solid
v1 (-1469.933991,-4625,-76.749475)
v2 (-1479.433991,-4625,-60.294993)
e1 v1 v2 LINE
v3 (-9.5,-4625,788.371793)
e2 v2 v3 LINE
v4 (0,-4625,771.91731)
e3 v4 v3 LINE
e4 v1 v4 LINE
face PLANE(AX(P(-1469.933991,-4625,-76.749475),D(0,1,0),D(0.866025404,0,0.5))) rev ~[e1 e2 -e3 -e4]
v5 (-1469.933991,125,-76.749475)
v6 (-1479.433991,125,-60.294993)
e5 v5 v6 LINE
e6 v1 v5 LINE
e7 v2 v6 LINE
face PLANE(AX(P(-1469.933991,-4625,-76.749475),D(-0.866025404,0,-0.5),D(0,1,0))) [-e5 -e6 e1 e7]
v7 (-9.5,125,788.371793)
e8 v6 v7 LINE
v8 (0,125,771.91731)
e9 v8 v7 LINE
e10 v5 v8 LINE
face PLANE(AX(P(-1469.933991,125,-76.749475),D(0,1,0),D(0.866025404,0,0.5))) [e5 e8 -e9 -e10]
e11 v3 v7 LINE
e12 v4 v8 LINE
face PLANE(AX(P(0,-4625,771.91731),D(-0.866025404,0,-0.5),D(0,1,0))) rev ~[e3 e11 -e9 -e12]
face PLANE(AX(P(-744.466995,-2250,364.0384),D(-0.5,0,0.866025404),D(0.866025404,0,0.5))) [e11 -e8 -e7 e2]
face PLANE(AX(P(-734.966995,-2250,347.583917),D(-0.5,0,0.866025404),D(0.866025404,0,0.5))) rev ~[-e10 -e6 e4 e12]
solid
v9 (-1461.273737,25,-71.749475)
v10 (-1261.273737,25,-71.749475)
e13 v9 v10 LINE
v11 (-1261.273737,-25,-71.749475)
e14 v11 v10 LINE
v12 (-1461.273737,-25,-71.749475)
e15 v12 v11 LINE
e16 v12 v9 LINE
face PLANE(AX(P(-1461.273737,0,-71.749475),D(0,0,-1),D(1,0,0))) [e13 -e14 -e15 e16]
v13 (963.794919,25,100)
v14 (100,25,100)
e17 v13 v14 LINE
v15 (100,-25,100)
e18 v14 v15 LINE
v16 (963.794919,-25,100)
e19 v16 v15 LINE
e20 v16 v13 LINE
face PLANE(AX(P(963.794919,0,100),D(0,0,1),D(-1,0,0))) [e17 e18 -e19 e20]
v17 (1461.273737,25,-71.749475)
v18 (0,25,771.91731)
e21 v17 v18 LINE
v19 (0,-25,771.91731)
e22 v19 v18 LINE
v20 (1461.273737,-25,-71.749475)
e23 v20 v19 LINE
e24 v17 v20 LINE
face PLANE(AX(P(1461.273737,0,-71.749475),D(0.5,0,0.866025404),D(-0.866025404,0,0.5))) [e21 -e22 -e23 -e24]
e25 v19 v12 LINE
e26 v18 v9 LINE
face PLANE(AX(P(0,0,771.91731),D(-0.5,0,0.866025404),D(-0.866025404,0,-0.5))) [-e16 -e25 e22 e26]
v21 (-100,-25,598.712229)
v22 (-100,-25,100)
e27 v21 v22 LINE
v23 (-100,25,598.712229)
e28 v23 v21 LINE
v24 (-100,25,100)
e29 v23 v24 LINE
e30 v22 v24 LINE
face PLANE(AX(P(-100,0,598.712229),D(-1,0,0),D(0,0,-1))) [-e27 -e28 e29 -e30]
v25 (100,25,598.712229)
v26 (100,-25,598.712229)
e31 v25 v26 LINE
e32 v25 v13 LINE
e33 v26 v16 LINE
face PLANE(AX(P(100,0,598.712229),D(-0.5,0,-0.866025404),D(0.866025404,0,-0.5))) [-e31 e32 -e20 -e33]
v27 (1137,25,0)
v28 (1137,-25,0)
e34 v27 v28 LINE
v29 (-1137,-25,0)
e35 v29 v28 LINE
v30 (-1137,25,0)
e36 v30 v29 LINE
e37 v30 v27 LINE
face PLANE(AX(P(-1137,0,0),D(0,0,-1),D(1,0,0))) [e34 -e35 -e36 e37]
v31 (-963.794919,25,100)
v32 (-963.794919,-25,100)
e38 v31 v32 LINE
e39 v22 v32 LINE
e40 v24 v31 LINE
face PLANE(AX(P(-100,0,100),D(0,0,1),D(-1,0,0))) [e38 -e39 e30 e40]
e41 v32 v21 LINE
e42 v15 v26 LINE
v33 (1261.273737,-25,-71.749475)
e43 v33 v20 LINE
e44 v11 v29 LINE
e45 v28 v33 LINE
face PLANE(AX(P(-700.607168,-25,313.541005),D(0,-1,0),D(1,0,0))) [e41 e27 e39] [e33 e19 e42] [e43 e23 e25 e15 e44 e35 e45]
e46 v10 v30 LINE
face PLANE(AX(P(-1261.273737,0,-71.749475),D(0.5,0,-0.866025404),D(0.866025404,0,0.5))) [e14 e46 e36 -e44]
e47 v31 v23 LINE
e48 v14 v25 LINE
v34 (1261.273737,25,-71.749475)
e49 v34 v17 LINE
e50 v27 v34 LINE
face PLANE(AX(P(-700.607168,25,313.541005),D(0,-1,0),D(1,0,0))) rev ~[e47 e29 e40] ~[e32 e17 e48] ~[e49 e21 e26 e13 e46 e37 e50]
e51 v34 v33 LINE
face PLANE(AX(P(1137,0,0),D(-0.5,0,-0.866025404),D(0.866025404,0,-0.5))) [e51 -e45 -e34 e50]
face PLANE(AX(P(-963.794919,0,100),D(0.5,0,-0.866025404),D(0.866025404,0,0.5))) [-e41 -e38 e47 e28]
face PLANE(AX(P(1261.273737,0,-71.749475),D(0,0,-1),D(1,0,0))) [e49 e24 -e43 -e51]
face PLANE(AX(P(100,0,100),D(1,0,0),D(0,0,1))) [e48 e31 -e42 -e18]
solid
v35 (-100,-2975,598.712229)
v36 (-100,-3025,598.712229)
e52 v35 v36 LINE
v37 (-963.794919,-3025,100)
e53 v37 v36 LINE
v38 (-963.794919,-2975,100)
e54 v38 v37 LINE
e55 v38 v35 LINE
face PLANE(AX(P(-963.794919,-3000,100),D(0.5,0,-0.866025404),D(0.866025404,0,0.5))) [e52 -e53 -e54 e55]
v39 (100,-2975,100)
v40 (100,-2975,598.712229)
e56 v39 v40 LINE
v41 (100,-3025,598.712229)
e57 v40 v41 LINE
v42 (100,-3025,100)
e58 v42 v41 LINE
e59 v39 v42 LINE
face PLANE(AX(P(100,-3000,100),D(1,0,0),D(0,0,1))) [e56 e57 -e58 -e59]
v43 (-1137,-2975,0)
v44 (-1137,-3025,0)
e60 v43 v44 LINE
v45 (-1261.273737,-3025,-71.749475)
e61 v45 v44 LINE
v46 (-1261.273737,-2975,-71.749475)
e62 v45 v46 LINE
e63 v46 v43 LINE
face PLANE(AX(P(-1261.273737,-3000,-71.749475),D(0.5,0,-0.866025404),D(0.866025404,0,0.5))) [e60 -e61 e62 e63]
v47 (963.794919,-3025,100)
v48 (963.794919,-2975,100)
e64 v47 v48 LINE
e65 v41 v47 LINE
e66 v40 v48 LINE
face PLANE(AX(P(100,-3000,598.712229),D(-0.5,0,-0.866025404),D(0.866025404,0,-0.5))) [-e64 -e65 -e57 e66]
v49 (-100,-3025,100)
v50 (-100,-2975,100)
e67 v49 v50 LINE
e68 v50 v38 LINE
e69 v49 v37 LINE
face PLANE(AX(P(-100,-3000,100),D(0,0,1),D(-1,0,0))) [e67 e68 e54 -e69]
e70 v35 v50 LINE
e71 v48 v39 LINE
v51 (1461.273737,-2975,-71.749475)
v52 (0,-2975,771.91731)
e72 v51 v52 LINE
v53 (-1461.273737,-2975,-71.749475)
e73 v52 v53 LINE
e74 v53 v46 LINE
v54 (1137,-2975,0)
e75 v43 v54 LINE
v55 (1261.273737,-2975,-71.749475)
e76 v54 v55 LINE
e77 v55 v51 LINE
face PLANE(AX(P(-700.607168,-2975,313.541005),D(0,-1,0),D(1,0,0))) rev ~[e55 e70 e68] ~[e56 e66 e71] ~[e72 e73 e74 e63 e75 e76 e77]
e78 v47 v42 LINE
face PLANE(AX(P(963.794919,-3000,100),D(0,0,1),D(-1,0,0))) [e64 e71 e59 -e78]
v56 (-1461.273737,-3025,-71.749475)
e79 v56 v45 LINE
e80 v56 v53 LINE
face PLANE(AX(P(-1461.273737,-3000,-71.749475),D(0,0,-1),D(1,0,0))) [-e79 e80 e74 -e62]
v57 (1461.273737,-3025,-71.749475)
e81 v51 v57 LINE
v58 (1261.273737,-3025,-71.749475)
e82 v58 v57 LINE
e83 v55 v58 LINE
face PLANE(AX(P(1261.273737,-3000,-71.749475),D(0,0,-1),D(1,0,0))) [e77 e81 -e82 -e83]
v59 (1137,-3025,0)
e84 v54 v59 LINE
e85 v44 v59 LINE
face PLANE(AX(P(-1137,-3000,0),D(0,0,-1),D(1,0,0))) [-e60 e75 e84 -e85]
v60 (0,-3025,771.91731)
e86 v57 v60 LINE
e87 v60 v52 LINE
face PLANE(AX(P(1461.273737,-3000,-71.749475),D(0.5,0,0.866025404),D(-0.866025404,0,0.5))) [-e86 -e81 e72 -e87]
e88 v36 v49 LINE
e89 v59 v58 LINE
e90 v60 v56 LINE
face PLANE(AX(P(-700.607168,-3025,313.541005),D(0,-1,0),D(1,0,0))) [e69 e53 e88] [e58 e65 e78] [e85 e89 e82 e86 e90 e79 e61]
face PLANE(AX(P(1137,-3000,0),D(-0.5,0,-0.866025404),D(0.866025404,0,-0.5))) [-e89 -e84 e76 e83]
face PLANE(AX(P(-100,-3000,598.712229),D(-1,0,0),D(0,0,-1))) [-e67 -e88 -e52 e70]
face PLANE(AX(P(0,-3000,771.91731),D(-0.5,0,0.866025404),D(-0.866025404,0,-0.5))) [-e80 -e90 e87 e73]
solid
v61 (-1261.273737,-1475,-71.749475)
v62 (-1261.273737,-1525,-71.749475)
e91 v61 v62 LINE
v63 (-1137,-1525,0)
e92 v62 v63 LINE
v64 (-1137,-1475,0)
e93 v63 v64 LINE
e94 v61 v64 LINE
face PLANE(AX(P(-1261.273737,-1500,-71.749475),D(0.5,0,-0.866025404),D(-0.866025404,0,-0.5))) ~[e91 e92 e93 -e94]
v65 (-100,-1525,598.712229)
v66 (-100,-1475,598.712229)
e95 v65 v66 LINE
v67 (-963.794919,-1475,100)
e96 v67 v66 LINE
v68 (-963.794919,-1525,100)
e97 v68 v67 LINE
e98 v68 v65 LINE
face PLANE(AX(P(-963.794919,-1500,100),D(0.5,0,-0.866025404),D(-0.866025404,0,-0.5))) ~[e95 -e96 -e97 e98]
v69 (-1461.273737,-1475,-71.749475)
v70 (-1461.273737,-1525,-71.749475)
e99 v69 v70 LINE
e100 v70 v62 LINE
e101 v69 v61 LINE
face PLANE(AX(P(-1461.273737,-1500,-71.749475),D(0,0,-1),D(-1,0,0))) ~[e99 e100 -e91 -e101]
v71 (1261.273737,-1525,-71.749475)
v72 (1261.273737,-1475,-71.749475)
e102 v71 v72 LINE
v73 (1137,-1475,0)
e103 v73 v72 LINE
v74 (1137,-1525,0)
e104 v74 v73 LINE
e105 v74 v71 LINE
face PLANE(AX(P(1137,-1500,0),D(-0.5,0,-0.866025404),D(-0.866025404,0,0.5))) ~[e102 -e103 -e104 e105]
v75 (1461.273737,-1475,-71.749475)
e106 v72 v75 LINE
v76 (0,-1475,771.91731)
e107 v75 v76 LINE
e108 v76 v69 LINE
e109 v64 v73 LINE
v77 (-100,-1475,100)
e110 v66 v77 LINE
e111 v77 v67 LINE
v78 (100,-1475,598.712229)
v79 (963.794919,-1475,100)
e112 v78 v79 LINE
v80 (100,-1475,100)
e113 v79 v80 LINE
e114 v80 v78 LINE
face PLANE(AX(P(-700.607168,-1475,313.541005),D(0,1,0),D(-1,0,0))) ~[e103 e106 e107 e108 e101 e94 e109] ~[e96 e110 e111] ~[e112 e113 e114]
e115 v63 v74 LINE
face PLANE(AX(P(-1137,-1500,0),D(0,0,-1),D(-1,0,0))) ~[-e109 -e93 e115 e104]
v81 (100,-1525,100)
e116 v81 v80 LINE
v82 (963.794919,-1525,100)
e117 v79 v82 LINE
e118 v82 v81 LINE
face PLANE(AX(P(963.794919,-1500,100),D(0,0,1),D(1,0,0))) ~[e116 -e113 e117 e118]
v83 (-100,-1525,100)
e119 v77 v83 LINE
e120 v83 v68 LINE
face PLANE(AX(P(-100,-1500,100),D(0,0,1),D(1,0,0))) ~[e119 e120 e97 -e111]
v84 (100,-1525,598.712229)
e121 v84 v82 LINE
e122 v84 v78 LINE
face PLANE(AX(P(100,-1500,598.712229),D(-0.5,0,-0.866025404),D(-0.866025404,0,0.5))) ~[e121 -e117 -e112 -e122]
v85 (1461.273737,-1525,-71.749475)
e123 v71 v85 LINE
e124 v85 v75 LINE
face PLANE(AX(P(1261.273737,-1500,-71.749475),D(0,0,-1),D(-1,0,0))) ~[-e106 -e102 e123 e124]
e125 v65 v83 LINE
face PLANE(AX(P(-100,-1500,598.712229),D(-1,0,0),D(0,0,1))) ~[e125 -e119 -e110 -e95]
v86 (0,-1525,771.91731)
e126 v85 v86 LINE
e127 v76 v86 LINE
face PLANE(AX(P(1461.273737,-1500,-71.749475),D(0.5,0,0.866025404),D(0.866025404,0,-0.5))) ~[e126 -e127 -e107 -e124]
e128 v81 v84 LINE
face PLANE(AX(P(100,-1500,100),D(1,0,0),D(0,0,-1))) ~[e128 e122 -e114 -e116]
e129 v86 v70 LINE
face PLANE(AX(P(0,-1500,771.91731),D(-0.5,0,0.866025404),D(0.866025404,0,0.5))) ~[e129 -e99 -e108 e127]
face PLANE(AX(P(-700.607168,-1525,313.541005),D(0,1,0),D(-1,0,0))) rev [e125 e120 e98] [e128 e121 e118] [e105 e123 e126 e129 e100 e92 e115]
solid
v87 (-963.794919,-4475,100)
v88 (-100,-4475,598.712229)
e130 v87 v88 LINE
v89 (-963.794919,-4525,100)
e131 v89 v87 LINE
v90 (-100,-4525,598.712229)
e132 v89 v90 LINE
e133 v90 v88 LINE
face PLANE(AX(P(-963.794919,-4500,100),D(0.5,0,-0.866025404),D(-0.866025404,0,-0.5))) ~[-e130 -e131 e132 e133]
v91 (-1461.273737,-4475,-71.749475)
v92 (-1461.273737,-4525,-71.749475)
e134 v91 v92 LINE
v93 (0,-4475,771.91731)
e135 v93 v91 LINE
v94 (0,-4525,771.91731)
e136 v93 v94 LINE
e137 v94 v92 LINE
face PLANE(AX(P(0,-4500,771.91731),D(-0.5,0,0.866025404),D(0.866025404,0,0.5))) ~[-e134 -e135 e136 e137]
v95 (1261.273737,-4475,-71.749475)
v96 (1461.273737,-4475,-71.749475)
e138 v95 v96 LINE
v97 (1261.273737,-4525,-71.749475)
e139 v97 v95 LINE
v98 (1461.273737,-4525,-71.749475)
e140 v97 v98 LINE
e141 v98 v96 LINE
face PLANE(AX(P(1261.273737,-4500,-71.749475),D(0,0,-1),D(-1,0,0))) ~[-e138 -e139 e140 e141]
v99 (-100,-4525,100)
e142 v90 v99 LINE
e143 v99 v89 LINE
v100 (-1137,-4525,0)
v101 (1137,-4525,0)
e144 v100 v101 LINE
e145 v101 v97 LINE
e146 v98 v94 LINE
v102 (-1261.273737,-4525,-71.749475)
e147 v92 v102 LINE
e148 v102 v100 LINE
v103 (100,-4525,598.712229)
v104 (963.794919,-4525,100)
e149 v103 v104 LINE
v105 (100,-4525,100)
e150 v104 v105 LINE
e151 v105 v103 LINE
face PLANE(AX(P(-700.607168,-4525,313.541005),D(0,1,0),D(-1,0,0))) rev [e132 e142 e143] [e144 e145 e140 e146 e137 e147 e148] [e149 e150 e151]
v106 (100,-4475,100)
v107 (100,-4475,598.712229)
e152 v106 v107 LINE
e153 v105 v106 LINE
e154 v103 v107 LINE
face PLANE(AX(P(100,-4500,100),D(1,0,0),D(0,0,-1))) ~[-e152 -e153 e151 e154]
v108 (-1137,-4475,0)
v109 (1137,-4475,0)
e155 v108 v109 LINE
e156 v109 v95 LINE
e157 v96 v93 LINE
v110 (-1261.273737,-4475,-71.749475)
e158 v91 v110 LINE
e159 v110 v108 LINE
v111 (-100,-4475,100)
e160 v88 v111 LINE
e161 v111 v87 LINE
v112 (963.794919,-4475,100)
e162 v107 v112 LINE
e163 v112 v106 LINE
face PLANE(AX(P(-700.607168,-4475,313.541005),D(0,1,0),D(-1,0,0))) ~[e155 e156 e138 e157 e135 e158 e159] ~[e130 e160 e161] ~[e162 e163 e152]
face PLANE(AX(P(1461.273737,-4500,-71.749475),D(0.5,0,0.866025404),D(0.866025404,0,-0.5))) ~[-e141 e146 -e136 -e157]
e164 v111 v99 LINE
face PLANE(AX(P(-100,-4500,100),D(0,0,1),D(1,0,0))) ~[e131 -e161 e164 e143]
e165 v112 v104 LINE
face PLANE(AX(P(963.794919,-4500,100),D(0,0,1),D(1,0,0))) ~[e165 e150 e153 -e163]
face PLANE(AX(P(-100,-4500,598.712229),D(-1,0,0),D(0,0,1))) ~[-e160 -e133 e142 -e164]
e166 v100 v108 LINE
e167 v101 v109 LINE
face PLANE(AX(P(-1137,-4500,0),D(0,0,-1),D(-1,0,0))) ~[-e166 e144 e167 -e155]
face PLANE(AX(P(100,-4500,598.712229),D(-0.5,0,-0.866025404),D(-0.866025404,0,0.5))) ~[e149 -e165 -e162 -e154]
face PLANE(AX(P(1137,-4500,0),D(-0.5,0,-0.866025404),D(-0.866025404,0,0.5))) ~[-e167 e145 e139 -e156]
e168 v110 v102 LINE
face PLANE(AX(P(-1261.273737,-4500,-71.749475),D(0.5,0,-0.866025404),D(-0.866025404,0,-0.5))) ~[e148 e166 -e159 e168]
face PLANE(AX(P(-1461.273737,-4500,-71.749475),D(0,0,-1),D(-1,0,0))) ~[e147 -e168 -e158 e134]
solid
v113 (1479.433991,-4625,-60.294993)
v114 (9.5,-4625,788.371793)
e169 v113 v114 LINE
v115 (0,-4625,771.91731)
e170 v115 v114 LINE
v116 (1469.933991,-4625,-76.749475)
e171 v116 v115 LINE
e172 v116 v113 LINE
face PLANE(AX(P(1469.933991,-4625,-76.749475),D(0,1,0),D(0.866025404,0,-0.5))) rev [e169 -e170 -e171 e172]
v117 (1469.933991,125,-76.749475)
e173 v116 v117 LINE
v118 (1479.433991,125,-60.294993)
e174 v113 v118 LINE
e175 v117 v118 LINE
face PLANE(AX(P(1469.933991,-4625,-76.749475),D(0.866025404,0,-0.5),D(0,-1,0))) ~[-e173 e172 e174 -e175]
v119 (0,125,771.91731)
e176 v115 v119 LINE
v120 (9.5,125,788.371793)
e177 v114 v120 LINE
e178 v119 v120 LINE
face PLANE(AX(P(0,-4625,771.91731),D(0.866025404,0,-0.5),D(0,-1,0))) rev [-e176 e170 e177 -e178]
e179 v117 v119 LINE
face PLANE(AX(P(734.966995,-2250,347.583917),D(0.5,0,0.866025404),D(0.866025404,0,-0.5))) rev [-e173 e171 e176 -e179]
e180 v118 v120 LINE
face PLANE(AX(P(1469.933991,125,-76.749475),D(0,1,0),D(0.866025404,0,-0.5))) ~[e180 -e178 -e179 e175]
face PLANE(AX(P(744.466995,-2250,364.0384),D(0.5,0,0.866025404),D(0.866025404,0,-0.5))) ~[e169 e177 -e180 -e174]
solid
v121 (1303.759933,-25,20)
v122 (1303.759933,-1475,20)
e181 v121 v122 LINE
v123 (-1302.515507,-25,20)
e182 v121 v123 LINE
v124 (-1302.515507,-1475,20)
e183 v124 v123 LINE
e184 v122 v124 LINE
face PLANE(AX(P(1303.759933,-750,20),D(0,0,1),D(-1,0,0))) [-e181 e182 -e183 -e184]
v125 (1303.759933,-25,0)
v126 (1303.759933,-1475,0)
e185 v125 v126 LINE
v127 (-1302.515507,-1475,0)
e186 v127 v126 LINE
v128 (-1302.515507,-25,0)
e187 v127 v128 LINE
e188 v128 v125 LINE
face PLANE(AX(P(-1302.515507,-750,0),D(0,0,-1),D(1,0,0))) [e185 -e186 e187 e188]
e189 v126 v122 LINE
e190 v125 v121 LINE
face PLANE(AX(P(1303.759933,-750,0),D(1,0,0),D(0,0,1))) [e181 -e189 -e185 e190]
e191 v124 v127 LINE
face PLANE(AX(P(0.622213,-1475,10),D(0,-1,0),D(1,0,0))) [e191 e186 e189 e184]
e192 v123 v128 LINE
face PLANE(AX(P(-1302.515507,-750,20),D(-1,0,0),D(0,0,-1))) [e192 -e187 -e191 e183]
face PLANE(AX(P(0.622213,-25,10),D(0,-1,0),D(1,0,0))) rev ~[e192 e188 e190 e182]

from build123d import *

# Parameters (mm, degrees)
F1_DEPTH       = 25
F7_W           = 1697.3335705802
F7_H           = 4750
F8_DEPTH       = 19
F11_DEPTH      = 725
F11_DEPTH_BACK = 725


with BuildPart() as f1:
    # F0 (on Front) → F1 (new body, symmetric)
    with BuildSketch(Plane.XZ):
        Polygon((-1261.2737367808, -71.7494753836), (-1137, 0), (-963.7949192431, 100), (-100, 598.7122291496), (0, 656.4472560686), (0, 771.9173099065), (-1337, 0), (-1461.2737367808, -71.7494753836), align=None)
        Polygon((-963.7949192431, 100), (-1137, 0), (1137, 0), (963.7949192431, 100), (100, 100), (0, 100), (-100, 100), align=None)
        Polygon((963.7949192431, 100), (1137, 0), (1261.2737367808, -71.7494753836), (1461.2737367808, -71.7494753836), (1337, 0), (0, 771.9173099065), (0, 656.4472560686), (100, 598.7122291496), align=None)
        Polygon((0, 656.4472560686), (-100, 598.7122291496), (-100, 100), (0, 100), align=None)
        Polygon((100, 598.7122291496), (0, 656.4472560686), (0, 100), (100, 100), align=None)
    extrude(amount=F1_DEPTH, both=True)


with BuildPart() as f3_1:
    # F3: instance of F1
    add(f1.part.mirror(Plane.XZ.offset(750)))


with BuildPart() as f5_1:
    # F5: instance of F3_1
    add(f3_1.part.mirror(Plane.XZ.offset(2250)))


with BuildPart() as f5_2:
    # F5: instance of F1
    add(f1.part.mirror(Plane.XZ.offset(2250)))


with BuildPart() as f8:
    # F7 (on face) → F8 (new body)
    with BuildSketch(Plane(origin=(-334.25, 0, 578.9379824299), x_dir=(0.8660254038, 0, 0.5), z_dir=(-0.5, 0, 0.8660254038))):
        with Locations((-462.7081303369, -2250)):
            Rectangle(F7_W, F7_H)
    extrude(amount=F8_DEPTH)


with BuildPart() as f9_1:
    # F9: instance of F8
    add(f8.part.mirror(Plane.YZ))


with BuildPart() as f11:
    # F10 (on offset) → F11 (new body, two sides)
    with BuildSketch(Plane.XZ.offset(750)) as f11_sk:
        Polygon((-1302.5155067444, 0), (-1137, 0), (1136.1624002457, 0), (1303.759932518, 0), (1303.759932518, 20), (1136.1624002457, 20), (-1137, 20), (-1302.5155067444, 20), align=None)
    extrude(amount=F11_DEPTH)
    extrude(f11_sk.sketch, amount=-F11_DEPTH_BACK)


solid = Compound([f1.part, f3_1.part, f5_1.part, f5_2.part, f8.part, f9_1.part, f11.part])
